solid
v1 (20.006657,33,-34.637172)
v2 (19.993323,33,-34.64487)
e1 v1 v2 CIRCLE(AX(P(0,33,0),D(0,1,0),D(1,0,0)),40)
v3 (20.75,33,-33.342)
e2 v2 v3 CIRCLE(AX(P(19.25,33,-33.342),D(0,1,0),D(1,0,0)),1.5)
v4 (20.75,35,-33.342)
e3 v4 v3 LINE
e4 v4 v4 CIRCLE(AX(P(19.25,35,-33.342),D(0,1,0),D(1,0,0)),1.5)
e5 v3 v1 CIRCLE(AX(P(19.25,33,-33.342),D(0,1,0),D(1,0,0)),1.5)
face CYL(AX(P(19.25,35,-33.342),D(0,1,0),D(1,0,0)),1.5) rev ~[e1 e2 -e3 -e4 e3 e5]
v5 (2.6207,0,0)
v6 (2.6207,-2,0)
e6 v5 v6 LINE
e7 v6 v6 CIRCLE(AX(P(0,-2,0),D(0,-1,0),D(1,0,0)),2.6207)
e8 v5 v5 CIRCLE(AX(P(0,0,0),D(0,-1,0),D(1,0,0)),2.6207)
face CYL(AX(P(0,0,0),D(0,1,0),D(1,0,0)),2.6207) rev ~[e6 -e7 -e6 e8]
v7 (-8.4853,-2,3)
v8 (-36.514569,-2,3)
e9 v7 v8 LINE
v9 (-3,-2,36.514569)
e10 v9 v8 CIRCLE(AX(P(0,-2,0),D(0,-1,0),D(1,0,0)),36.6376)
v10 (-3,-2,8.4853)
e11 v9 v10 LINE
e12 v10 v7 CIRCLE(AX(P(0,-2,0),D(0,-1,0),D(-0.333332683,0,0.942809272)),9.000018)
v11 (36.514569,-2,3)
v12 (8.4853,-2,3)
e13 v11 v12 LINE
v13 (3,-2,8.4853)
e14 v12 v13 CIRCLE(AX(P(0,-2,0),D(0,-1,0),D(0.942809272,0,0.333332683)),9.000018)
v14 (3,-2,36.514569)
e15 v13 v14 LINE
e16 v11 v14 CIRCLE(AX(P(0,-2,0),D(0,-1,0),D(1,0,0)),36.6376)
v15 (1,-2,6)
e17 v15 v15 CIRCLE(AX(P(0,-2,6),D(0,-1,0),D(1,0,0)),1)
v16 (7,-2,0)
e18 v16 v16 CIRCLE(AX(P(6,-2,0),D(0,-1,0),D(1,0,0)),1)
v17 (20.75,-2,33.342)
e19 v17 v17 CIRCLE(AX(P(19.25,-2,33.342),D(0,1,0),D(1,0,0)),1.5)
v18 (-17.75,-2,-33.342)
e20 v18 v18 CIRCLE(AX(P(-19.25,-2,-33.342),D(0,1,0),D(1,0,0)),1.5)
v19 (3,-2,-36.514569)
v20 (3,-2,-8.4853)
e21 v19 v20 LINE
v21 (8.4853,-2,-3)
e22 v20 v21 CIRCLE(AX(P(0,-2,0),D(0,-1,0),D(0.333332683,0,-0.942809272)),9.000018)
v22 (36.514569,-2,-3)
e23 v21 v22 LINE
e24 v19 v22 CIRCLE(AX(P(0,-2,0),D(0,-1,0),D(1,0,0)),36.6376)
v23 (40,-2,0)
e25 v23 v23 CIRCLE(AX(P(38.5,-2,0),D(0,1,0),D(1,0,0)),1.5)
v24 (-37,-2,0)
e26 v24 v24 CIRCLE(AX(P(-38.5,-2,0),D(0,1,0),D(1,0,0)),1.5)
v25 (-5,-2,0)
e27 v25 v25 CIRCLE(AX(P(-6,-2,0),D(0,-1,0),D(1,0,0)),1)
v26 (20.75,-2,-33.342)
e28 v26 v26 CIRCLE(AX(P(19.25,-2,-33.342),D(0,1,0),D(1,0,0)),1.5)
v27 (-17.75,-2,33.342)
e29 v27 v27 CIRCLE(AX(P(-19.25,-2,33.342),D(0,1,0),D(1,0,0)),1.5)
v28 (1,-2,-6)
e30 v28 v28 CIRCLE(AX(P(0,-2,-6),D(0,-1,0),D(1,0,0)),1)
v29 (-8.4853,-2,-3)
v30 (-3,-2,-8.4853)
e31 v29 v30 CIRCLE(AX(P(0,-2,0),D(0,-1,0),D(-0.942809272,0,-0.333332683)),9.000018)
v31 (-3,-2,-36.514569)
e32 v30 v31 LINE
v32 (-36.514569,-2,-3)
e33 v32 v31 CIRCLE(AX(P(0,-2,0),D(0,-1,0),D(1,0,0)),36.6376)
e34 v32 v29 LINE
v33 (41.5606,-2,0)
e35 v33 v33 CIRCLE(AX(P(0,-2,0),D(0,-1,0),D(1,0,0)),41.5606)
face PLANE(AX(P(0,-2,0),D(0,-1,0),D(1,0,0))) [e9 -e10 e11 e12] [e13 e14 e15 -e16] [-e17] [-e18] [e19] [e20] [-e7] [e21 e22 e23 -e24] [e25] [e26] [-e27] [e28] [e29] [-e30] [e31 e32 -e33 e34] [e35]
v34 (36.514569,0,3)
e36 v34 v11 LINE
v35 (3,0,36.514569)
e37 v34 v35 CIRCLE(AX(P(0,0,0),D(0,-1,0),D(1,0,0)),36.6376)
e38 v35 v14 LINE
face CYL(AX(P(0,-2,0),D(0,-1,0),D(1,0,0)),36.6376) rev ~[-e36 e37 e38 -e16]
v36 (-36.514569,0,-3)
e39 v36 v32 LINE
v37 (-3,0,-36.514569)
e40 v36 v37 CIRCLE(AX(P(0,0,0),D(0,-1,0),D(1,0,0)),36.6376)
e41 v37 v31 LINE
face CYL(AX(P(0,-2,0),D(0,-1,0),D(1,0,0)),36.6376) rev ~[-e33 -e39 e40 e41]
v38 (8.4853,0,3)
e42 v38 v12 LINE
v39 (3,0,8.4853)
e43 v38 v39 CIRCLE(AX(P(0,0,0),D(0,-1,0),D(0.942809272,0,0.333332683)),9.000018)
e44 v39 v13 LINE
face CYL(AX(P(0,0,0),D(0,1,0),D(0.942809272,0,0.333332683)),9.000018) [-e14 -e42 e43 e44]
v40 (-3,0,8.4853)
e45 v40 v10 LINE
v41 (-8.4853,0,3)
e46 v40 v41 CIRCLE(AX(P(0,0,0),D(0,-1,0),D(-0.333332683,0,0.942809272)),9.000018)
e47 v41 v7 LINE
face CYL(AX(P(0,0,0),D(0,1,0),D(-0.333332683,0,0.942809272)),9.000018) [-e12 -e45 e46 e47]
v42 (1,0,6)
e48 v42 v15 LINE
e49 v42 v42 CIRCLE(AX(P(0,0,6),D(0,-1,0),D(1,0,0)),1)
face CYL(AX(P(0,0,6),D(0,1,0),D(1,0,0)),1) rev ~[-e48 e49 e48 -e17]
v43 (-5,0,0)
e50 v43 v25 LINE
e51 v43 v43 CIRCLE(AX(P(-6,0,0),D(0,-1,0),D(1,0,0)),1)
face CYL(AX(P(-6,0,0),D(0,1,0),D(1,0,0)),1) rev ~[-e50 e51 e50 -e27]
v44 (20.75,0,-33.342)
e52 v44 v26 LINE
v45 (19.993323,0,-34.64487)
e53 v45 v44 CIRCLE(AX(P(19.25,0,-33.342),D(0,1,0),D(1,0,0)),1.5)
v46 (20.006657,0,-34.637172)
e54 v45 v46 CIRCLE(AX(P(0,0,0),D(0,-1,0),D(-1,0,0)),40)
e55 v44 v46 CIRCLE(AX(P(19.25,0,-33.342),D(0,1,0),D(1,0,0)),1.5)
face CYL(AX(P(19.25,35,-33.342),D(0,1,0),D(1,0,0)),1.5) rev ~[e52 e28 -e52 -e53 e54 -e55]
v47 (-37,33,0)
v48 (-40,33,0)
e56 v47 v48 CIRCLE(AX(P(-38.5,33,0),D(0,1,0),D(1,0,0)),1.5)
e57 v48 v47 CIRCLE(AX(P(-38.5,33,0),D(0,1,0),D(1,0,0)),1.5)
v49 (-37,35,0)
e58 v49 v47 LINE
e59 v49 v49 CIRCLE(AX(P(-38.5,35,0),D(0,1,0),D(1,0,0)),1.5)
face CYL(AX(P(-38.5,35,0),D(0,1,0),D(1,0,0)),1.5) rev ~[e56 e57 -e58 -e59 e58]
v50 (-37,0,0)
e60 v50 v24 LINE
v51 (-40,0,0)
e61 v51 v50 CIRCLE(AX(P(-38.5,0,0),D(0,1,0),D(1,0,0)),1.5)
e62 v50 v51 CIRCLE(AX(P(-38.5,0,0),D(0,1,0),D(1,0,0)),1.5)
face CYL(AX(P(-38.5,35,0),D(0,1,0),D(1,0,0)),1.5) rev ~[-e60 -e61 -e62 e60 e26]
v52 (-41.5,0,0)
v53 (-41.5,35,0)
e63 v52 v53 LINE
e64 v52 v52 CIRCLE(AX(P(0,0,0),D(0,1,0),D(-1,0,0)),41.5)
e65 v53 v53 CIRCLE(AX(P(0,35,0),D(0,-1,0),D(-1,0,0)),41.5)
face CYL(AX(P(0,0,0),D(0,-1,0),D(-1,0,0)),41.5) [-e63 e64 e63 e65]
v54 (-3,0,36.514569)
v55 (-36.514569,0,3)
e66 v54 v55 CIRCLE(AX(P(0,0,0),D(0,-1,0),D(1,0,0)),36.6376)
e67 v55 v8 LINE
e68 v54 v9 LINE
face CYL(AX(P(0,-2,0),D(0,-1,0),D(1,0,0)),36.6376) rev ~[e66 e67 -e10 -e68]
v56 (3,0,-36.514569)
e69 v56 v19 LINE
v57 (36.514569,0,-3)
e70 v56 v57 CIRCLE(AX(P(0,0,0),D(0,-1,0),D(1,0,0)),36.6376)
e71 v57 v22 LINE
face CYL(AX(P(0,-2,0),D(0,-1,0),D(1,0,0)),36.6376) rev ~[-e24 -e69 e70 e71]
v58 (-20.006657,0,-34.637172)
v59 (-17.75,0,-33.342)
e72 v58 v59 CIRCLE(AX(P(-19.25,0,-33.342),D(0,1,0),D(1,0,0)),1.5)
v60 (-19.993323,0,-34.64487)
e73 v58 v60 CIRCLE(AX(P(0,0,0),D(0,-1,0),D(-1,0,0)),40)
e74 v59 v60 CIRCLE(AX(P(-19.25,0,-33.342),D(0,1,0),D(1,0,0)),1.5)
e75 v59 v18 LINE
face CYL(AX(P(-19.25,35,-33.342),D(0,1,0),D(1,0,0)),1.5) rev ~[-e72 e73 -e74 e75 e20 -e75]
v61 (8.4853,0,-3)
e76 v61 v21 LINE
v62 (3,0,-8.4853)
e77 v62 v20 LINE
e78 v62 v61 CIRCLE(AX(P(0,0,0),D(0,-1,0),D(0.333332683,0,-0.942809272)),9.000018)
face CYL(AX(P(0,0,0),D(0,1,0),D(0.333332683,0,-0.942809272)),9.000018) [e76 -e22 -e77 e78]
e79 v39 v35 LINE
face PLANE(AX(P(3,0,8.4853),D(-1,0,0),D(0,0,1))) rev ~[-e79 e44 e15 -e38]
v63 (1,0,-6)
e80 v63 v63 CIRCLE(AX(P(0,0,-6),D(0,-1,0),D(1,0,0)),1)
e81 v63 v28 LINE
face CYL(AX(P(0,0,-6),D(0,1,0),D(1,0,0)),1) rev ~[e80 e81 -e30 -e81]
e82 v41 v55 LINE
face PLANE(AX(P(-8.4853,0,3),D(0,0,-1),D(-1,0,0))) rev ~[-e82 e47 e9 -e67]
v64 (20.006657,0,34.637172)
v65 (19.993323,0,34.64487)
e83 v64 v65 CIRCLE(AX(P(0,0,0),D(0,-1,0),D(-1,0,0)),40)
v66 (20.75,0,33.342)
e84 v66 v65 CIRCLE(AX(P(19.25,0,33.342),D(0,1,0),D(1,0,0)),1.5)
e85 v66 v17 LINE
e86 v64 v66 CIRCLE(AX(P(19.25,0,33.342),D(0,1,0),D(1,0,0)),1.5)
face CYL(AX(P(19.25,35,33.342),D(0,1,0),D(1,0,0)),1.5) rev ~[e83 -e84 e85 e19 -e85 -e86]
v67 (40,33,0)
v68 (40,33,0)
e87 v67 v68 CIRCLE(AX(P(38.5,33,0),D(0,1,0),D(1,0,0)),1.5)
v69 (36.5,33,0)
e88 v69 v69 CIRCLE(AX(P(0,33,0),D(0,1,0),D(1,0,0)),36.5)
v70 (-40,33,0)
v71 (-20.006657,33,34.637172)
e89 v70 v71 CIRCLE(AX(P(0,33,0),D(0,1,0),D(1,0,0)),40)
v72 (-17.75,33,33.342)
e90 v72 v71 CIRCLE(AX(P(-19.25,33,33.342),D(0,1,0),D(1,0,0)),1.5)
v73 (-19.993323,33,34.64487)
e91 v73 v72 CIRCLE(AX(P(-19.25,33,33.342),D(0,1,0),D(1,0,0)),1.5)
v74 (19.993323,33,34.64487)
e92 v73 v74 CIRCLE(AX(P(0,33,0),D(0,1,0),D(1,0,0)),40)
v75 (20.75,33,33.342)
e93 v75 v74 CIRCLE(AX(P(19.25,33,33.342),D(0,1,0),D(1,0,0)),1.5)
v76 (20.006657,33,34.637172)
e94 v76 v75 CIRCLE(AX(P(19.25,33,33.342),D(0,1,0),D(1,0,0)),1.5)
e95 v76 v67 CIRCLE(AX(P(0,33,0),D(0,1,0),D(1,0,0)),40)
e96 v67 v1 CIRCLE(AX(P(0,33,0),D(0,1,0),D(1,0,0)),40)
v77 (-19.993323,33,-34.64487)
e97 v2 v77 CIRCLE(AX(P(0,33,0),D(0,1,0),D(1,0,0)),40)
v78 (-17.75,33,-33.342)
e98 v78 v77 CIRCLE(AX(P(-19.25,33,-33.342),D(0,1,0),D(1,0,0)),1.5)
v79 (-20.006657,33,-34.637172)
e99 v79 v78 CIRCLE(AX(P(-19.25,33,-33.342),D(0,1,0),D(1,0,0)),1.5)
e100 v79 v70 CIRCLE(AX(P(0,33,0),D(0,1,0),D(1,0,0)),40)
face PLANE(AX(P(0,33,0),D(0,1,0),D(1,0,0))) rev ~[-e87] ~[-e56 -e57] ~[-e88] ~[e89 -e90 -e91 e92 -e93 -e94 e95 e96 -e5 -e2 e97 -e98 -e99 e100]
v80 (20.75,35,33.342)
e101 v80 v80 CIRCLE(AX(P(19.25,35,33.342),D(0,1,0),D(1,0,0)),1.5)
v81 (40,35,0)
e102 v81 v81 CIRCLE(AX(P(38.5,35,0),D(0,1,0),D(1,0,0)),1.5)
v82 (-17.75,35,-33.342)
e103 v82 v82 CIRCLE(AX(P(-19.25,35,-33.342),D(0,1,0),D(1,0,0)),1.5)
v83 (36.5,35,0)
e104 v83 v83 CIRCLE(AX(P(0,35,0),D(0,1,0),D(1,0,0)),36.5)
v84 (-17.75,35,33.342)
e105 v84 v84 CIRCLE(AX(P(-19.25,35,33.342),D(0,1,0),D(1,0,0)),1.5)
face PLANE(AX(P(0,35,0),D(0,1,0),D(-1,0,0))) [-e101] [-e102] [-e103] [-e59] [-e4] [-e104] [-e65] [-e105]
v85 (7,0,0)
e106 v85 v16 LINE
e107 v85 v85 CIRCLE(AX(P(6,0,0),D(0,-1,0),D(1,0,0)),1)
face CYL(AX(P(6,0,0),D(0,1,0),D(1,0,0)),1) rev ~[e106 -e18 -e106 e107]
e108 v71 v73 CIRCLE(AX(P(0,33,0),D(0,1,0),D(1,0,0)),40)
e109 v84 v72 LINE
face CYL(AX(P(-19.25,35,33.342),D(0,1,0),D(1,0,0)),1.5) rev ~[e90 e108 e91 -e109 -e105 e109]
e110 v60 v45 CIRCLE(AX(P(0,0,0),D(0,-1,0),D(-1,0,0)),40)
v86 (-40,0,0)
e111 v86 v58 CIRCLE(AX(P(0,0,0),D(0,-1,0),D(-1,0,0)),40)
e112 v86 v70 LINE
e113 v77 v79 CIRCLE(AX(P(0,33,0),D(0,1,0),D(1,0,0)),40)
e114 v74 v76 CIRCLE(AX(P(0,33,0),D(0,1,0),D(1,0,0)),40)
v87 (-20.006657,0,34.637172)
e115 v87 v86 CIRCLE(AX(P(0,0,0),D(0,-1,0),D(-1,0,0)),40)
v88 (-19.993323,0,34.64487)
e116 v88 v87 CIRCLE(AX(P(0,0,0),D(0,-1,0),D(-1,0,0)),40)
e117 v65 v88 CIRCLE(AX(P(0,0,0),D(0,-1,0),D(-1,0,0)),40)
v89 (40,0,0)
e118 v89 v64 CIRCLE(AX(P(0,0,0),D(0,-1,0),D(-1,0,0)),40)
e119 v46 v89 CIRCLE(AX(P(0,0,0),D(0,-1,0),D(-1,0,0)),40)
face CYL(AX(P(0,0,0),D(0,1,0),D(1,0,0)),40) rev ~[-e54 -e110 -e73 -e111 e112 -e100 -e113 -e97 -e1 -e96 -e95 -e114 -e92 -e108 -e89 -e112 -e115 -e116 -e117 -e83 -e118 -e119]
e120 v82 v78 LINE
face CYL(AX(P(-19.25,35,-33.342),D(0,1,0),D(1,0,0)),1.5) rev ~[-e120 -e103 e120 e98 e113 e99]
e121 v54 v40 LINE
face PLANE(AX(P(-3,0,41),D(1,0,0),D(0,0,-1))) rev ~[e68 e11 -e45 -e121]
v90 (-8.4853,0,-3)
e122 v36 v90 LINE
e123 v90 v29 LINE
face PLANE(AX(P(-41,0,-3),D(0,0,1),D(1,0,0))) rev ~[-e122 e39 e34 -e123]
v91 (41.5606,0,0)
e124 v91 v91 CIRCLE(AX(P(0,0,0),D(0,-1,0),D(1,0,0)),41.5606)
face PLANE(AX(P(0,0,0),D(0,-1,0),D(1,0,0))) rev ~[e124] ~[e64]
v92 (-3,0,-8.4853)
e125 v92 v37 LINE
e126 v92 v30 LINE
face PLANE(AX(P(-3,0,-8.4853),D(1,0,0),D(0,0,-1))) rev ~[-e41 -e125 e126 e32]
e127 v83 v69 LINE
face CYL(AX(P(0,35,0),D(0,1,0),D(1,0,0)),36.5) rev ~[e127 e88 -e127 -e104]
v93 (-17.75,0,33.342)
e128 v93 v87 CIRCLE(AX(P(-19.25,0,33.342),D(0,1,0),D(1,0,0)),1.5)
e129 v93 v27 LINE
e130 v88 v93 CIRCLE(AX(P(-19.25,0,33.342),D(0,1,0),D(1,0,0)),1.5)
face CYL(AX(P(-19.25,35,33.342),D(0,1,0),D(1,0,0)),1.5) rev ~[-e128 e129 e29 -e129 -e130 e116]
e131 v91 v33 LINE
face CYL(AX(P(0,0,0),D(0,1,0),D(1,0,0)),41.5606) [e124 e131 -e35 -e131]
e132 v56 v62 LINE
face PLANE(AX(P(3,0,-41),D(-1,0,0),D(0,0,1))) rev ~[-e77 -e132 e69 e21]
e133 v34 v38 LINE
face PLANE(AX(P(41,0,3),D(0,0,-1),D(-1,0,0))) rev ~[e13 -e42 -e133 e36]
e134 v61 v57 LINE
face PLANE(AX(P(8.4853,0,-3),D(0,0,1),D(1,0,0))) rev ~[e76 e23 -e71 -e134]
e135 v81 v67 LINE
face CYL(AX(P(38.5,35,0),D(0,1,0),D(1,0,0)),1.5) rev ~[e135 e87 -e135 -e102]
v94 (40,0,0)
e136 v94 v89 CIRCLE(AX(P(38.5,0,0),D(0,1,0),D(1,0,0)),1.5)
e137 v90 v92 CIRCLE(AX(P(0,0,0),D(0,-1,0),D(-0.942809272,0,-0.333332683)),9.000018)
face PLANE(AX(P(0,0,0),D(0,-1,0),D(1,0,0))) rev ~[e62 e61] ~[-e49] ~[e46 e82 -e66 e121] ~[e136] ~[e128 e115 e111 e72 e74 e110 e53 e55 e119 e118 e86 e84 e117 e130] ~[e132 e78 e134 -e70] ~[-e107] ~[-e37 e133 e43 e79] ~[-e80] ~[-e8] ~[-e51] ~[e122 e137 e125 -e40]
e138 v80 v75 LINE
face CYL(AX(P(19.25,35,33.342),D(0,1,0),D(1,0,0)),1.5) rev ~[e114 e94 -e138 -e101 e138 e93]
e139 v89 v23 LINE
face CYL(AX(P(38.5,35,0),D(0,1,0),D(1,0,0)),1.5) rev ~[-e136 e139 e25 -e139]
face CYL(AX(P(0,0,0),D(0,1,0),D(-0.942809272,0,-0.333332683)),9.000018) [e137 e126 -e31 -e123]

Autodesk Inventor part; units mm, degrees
ref_plane "YZ Plane" through (0, 0, 0) normal (1, 0, 0) x (0, 1, 0)
ref_plane "XZ Plane" through (0, 0, 0) normal (0, 1, 0) x (-1, 0, 0)
ref_plane "XY Plane" through (0, 0, 0) normal (0, 0, 1) x (1, 0, 0)
sketch "Sketch1" plane through (0, 0, 0) normal (0, 1, 0) x (-1, 0, 0)
  circle A0 centre (0, 0) radius 40
  circle A1 centre (0, 0) radius 41.5
  dimension "d0" = 80
  dimension "d1" = 83
extrude "Extrusion1" add sketch "Sketch1" along normal blind 35
sketch "Sketch7" plane through (0, 0, 0) normal (0, -1, 0) x (1, 0, 0)
  line L0 (-3, -41) -> (3, -41)
  line L1 (3, 41) -> (-3, 41)
  line L2 (-3, -41) -> (3, 41) construction
  line L3 (3, -41) -> (-3, 41) construction
  line L4 (41, -3) -> (41, 3)
  line L5 (-41, 3) -> (-41, -3)
  line L6 (-41, -3) -> (41, 3) construction
  line L7 (41, -3) -> (-41, 3) construction
  line L8 (-3, 41) -> (-3, 8.4853)
  line L9 (-8.4853, 3) -> (-41, 3)
  line L10 (3, 8.4853) -> (3, 41)
  line L11 (41, 3) -> (8.4853, 3)
  line L12 (-3, -8.4853) -> (-3, -41)
  line L13 (-41, -3) -> (-8.4853, -3)
  line L14 (3, -41) -> (3, -8.4853)
  line L15 (8.4853, -3) -> (41, -3)
  arc A0 (3, -8.4853) -> (8.4853, -3) centre (0, 0) ccw
  arc A1 (-8.4853, -3) -> (-3, -8.4853) centre (0, 0) ccw
  arc A2 (8.4853, 3) -> (3, 8.4853) centre (0, 0) ccw
  arc A3 (-3, 8.4853) -> (-8.4853, 3) centre (0, 0) ccw
  circle A4 centre (0, 6) radius 1
  circle A5 centre (-6, 0) radius 1
  circle A6 centre (0, -6) radius 1
  circle A7 centre (6, 0) radius 1
  circle A8 centre (0, 0) radius 2.6207
  dimension "d35" = 6
  dimension "d36" = 82
  dimension "d37" = 6
  dimension "d38" = 82
  dimension "d41" = 2
  dimension "d44" = 360
extrude "Extrusion7" add sketch "Sketch7" along normal blind 2
sketch "Sketch8" plane through (0, 0, 0) normal (0, -1, 0) x (1, 0, 0)
  circle A0 centre (0, 0) radius 41.5606
  circle A1 centre (0, 0) radius 40
  circle A2 centre (0, 0) radius 41.5606
  circle A3 centre (0, 0) radius 40
extrude "Extrusion8" add sketch "Sketch8" along normal blind 2
sketch "Sketch9" plane through (0, -2, 0) normal (0, -1, 0) x (1, 0, 0)
  circle A0 centre (0, 0) radius 36.6376
  circle A1 centre (0, 0) radius 41.5606 projected
  dimension "d64" = 73.2751
  dimension "d65" = 83.1212
extrude "Extrusion9" add sketch "Sketch9" against normal blind 2
sketch "Sketch10" plane through (0, 35, 0) normal (0, 1, 0) x (1, 0, 0)
  circle A0 centre (0, 0) radius 36.5
  circle A1 centre (0, 0) radius 41.5
  dimension "d52" = 73
  dimension "d53" = 83
extrude "Extrusion10" add sketch "Sketch10" against normal blind 2
sketch "Sketch11" plane through (0, 35, 0) normal (0, 1, 0) x (1, 0, 0)
  circle A0 centre (-38.5, 0) radius 1.5
  circle A1 centre (-19.25, -33.342) radius 1.5
  circle A2 centre (19.25, -33.342) radius 1.5
  circle A3 centre (38.5, 0) radius 1.5
  circle A4 centre (19.25, 33.342) radius 1.5
  circle A5 centre (-19.25, 33.342) radius 1.5
  point P0 (0, 0)
  dimension "d56" = 3
  dimension "d57" = 38.5
  dimension "d60" = 360
extrude "Extrusion11" cut sketch "Sketch11" against normal blind 100
properties part number "Motor mount (plain)"
